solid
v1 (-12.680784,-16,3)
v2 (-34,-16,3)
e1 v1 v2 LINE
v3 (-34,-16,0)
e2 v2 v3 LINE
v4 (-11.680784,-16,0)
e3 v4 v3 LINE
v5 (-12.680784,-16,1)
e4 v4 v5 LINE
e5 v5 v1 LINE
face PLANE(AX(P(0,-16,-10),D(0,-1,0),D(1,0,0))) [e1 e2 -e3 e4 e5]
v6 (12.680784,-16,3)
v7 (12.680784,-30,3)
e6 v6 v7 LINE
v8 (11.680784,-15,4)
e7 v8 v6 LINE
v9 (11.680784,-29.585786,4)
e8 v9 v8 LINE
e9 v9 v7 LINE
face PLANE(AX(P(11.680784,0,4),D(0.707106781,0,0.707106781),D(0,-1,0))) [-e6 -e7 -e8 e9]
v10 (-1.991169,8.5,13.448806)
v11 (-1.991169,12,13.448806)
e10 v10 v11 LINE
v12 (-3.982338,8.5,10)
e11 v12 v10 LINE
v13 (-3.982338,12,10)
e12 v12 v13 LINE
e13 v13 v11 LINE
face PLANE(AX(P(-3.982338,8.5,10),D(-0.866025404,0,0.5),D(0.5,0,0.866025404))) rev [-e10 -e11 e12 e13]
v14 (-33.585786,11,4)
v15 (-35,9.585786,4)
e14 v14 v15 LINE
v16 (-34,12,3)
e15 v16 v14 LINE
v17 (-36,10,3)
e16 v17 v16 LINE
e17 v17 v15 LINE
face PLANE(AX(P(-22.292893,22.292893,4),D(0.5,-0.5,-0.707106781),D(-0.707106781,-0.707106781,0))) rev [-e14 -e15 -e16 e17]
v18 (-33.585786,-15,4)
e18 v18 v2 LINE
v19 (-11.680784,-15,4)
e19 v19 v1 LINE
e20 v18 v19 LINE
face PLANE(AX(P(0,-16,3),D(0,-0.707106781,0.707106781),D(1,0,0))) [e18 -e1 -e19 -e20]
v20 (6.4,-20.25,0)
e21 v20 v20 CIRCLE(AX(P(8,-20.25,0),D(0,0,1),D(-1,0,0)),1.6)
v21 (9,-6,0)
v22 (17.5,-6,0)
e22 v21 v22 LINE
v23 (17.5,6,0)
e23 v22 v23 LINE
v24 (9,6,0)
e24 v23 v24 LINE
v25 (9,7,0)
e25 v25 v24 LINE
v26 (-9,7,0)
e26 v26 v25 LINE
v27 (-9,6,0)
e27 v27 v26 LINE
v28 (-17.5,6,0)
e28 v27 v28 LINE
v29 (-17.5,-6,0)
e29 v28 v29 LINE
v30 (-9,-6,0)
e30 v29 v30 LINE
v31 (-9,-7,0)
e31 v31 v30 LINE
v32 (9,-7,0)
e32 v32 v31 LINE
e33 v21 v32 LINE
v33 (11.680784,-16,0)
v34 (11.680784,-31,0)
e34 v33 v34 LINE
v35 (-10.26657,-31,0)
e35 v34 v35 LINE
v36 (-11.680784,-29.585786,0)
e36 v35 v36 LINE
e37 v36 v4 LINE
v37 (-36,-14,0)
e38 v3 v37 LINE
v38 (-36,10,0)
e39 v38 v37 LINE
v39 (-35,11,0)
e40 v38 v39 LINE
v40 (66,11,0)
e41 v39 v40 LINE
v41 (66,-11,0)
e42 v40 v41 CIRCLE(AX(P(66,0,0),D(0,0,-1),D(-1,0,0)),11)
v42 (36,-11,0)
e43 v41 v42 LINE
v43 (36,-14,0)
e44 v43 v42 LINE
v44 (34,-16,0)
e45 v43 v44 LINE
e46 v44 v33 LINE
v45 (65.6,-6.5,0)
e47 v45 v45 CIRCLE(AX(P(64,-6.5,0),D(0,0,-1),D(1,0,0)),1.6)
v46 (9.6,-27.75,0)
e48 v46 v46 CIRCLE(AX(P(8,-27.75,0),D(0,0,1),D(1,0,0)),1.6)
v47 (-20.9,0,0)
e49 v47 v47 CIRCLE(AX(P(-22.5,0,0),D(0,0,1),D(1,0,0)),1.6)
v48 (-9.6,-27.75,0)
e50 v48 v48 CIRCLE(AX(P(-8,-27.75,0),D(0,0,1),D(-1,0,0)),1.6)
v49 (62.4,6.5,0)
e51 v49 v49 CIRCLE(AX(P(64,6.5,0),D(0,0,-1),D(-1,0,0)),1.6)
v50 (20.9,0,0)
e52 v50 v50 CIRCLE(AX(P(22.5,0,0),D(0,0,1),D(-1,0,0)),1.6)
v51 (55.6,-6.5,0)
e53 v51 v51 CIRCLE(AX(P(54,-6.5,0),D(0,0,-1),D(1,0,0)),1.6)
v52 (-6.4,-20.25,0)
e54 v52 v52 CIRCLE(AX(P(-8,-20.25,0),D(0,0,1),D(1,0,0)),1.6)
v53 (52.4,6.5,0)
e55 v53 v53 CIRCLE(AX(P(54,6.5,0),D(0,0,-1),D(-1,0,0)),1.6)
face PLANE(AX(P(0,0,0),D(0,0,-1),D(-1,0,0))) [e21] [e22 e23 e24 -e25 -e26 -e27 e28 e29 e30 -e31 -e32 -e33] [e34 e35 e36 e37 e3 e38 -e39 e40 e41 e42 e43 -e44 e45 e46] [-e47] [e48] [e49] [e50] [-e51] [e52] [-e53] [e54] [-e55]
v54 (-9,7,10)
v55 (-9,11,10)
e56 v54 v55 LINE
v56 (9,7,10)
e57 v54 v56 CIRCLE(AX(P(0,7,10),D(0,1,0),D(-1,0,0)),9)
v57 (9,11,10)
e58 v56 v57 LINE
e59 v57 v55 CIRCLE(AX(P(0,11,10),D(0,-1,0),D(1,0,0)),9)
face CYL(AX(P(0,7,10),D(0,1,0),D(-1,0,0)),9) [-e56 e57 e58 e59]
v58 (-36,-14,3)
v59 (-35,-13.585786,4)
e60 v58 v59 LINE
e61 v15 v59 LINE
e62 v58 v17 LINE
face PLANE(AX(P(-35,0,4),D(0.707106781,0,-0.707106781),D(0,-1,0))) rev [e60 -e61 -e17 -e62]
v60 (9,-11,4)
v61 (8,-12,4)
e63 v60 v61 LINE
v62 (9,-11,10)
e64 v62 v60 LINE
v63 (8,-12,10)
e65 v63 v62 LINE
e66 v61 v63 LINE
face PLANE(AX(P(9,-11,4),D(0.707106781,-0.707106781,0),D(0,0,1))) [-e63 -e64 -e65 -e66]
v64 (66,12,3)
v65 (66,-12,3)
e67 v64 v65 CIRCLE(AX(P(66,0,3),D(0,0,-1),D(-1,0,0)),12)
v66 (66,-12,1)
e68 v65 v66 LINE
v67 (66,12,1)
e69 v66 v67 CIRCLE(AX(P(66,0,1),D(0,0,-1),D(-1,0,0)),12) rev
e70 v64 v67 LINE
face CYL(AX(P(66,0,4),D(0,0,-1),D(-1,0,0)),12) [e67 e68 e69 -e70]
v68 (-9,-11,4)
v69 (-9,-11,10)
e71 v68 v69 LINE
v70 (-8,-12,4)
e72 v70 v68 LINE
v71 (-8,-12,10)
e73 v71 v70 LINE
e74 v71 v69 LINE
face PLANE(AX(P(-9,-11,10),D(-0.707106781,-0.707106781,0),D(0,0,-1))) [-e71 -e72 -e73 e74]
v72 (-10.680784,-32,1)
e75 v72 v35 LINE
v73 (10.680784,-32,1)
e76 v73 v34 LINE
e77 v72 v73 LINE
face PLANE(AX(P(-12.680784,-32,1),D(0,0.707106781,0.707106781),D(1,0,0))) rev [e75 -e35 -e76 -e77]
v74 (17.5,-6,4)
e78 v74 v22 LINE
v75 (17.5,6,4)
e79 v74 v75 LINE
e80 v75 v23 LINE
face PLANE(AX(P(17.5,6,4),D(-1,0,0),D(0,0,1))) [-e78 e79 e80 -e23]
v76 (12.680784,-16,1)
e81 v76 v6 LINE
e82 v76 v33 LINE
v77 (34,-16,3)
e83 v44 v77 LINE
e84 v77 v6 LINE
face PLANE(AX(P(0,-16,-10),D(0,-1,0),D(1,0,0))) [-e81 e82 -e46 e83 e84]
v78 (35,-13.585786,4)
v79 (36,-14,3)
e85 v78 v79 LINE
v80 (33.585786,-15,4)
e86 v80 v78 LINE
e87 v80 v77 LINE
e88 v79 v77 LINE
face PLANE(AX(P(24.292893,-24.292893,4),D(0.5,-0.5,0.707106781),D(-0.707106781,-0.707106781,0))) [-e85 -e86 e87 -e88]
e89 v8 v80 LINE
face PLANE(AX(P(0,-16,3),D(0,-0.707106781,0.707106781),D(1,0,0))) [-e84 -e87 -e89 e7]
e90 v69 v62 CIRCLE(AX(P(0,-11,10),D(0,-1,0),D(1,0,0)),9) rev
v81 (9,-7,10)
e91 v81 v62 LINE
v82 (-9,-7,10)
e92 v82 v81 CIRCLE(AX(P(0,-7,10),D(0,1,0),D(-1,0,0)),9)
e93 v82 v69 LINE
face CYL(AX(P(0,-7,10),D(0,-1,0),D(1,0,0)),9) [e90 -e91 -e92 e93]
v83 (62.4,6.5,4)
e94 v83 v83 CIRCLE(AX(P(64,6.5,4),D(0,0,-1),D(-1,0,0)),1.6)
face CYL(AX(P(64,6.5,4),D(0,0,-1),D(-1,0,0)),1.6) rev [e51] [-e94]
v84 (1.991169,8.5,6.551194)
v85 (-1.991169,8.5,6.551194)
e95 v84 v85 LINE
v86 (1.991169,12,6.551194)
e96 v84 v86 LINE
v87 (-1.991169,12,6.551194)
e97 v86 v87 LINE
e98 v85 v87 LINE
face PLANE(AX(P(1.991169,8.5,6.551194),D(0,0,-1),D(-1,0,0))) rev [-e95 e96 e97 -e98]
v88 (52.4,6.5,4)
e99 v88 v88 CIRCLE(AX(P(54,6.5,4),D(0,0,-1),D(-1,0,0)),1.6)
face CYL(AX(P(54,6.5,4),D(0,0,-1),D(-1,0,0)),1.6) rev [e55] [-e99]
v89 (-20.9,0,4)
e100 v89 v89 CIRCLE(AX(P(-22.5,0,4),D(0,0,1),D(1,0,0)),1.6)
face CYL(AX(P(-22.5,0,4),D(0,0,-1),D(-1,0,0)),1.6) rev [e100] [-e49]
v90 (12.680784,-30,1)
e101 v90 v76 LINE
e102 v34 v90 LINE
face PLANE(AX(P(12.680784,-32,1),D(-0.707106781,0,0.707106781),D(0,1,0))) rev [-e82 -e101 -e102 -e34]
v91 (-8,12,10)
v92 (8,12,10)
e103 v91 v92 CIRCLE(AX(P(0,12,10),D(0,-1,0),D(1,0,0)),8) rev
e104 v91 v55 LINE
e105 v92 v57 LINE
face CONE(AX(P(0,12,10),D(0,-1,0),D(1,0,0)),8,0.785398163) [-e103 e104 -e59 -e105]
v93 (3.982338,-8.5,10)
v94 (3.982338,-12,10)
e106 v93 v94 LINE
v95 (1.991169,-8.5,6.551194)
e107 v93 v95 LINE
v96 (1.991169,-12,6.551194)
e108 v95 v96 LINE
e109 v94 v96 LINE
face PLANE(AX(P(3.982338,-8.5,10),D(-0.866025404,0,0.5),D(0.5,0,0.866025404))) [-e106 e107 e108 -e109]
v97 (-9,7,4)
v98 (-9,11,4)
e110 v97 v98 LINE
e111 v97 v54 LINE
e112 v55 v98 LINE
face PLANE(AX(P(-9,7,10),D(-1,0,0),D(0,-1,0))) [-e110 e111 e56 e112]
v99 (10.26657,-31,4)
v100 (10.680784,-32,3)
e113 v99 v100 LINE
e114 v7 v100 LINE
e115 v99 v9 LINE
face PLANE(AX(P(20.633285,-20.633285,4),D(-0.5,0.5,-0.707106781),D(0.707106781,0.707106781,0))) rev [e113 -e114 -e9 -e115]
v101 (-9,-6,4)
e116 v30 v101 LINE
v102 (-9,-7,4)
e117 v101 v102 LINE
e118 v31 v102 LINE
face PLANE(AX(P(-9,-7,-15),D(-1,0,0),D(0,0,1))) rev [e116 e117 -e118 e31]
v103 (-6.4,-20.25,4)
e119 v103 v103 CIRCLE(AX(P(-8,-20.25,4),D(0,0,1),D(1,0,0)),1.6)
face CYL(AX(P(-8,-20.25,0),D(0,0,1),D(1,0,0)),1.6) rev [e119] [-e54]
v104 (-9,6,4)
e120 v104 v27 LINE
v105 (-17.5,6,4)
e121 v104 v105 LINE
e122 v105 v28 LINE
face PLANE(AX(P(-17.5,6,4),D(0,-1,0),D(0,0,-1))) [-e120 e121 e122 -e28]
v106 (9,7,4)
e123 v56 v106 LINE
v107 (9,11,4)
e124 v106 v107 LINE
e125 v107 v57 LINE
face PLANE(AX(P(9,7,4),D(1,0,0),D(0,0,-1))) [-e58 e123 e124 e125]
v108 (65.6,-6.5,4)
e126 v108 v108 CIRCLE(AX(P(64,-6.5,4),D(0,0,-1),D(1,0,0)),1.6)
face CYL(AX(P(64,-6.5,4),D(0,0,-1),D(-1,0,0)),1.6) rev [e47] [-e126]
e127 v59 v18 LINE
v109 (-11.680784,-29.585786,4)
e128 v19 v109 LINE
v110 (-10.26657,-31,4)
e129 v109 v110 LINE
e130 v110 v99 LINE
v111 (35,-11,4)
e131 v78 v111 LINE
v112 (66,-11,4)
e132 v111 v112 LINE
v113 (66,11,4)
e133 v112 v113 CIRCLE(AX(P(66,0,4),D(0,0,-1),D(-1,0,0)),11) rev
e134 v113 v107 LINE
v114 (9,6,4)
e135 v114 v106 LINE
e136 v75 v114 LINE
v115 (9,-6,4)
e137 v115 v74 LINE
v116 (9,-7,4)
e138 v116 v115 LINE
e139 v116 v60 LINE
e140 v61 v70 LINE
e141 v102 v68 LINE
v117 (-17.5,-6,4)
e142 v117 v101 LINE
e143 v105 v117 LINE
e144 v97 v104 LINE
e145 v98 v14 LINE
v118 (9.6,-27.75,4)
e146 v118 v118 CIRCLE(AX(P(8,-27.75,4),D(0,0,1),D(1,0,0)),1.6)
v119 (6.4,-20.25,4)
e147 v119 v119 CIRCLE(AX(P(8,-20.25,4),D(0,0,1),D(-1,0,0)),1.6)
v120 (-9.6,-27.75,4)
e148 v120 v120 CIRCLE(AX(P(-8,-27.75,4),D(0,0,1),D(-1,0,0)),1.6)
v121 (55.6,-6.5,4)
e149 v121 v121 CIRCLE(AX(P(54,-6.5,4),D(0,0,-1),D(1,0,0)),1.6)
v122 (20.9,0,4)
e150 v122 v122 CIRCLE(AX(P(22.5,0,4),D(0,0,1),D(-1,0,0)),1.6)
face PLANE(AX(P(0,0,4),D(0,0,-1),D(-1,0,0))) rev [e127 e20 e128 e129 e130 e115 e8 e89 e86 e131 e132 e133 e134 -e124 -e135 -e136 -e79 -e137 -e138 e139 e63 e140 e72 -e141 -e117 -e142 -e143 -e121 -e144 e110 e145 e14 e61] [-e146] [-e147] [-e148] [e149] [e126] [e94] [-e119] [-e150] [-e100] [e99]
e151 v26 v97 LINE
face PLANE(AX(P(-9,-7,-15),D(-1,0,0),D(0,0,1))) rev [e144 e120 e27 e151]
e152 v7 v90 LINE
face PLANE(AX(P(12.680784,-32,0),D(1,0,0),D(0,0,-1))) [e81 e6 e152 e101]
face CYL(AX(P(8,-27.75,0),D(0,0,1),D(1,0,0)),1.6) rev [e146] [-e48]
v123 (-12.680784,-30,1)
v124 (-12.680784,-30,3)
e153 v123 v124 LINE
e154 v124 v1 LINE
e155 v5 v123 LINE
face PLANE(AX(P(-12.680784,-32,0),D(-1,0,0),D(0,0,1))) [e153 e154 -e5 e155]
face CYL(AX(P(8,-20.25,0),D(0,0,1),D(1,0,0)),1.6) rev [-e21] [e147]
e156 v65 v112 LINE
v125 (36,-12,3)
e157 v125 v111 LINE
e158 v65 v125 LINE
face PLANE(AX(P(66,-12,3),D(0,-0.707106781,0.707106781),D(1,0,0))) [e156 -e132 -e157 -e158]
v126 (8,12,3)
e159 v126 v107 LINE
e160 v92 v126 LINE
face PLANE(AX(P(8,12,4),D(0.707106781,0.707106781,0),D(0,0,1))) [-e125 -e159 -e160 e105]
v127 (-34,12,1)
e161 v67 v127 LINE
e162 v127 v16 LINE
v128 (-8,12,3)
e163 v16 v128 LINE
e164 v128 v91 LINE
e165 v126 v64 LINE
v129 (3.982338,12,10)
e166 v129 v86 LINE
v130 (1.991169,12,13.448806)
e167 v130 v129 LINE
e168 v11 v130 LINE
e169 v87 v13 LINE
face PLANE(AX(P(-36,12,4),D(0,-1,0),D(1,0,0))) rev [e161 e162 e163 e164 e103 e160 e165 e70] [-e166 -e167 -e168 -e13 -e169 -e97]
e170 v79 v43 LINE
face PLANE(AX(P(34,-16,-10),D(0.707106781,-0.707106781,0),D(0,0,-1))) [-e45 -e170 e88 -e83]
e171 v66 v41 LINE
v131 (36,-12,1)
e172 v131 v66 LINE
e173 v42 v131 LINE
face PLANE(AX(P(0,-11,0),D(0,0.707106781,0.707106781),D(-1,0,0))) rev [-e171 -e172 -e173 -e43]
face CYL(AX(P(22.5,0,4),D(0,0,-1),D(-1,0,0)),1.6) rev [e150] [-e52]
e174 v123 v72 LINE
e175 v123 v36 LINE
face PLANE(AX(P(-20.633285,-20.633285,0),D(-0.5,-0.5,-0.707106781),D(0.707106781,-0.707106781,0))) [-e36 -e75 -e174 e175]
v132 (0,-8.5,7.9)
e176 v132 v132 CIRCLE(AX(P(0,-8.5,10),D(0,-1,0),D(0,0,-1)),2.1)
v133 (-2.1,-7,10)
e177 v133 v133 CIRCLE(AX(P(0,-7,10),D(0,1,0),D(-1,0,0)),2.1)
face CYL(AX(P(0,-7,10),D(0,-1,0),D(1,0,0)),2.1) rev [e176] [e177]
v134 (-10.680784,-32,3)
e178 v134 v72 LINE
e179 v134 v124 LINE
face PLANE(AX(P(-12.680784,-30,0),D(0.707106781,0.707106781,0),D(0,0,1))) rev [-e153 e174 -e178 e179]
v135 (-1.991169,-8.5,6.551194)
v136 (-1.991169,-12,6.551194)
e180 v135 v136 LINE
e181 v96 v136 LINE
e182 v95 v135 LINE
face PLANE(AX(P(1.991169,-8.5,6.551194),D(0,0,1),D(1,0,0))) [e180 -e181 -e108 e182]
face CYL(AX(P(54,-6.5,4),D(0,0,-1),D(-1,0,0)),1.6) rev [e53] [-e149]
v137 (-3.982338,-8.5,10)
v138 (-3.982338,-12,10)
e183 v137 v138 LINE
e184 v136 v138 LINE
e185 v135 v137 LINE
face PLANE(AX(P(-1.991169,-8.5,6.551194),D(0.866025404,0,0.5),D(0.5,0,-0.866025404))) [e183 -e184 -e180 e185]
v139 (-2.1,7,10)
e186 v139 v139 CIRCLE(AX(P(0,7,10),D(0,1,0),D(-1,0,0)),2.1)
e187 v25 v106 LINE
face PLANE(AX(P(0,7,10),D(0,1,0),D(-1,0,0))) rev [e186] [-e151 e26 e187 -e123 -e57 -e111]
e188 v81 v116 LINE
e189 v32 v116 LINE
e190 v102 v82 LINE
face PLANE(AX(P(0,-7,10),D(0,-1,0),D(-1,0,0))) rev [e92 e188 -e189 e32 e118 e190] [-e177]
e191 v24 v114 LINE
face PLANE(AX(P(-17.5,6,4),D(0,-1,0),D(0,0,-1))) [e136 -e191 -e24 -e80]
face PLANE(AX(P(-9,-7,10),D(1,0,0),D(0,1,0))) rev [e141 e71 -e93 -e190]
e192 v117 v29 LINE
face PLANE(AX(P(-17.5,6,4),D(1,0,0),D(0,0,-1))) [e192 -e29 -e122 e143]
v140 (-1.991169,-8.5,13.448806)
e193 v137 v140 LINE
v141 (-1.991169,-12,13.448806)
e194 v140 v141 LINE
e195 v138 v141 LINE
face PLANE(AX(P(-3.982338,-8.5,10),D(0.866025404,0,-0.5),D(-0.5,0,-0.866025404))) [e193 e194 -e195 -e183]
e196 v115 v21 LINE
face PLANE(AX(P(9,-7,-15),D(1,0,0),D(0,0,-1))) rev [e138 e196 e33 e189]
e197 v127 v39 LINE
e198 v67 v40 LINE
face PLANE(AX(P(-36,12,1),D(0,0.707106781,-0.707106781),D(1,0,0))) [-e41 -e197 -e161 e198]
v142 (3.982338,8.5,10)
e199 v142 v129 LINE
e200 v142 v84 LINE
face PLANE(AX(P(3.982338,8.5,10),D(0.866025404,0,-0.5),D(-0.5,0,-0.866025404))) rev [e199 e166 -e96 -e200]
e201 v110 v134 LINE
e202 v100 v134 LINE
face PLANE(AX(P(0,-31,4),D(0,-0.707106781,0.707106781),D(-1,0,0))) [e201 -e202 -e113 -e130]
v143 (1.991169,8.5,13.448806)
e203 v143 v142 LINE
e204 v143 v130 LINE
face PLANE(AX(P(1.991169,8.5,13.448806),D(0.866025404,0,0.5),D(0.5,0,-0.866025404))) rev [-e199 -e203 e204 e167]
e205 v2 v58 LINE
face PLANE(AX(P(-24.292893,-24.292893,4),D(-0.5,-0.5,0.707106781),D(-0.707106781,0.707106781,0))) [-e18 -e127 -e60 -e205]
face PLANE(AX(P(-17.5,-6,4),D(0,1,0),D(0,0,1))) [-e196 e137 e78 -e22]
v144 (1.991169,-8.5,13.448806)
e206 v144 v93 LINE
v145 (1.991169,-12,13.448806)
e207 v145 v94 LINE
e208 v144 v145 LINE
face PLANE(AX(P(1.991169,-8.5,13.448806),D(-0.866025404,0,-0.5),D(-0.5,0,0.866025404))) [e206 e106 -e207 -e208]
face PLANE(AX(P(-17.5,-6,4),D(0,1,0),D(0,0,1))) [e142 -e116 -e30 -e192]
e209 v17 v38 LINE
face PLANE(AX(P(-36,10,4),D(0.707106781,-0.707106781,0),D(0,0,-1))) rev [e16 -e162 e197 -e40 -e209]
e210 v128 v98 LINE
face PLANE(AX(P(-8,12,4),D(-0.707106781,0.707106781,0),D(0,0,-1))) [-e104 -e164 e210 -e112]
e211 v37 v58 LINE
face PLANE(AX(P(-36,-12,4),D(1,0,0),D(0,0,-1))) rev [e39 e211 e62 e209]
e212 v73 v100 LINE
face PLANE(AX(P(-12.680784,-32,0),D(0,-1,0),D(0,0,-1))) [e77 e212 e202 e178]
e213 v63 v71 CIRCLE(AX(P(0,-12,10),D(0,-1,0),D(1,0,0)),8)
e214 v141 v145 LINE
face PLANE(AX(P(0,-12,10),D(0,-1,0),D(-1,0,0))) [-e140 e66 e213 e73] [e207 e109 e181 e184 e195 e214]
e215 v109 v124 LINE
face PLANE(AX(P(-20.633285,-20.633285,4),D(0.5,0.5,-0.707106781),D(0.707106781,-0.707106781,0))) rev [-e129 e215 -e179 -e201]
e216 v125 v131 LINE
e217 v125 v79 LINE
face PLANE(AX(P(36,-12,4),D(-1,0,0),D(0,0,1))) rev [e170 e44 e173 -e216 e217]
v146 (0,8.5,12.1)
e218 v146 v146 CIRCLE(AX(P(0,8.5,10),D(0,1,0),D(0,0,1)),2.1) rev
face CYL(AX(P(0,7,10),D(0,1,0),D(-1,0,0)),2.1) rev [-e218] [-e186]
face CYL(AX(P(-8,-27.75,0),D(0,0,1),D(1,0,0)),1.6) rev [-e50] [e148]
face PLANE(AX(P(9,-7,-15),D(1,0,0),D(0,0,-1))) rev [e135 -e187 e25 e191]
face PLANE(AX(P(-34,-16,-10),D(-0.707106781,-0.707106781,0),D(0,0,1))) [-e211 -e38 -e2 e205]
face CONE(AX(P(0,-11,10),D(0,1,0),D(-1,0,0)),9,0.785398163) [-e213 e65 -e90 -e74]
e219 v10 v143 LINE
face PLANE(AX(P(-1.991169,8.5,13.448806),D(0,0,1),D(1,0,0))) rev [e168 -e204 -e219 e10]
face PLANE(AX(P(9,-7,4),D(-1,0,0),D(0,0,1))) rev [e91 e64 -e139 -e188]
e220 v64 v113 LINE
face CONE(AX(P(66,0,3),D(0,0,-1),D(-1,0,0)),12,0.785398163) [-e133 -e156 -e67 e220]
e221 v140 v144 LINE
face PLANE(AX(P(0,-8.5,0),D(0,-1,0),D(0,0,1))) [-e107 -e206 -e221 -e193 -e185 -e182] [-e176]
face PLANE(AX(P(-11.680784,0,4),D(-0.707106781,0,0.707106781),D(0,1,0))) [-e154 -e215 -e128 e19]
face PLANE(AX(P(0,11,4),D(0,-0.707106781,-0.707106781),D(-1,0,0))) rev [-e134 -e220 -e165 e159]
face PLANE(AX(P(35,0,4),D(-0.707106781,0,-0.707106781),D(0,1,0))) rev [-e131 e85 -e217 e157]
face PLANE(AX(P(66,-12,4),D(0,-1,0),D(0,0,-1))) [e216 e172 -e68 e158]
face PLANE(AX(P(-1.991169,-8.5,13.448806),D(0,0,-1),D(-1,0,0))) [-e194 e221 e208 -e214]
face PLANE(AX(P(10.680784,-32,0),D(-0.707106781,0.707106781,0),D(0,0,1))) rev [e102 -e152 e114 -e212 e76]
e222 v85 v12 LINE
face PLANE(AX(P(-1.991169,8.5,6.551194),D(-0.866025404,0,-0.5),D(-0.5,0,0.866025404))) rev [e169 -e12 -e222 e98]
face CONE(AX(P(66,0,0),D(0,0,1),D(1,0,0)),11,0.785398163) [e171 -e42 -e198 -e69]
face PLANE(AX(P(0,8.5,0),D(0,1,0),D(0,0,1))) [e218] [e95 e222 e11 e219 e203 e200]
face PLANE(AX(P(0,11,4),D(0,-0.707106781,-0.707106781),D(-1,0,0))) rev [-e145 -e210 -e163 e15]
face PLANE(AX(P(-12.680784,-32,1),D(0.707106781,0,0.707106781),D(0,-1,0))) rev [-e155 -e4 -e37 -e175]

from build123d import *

# Parameters (mm, degrees)
CROQUIS1_W              = 72
CROQUIS1_H              = 24
CROQUIS1_R              = 1.6
CROQUIS1_W_2            = 35
CROQUIS1_H_2            = 12
SALIENTE_EXTRUIR1_DEPTH = 4
CROQUIS2_R              = 3.125
SALIENTE_EXTRUIR2_DEPTH = 4
CROQUIS3_R              = 1.6
SALIENTE_EXTRUIR3_DEPTH = 4
CROQUIS5_R              = 2.1
SALIENTE_EXTRUIR4_DEPTH = 5
CORTAR_EXTRUIR1_DEPTH   = 3.5
REDONDEO1_R             = 3
CROQUIS7_W              = 25.361567636
CROQUIS7_H              = 16
CROQUIS7_R              = 1.6
SALIENTE_EXTRUIR5_DEPTH = 4
CHAFL_N1_SIZE           = 2
CHAFL_N2_SIZE           = 1
CROQUIS8_W              = 18
CROQUIS8_H              = 14
CORTAR_EXTRUIR2_DEPTH   = 87.423376467
CROQUIS9_W              = 19.069204895
CROQUIS9_H              = 8.04839492
CORTAR_EXTRUIR3_DEPTH   = 120.920807202


with BuildPart() as part:
    # Croquis1 → Saliente-Extruir1 (new body)
    with BuildSketch(Plane.XY):
        Rectangle(CROQUIS1_W, CROQUIS1_H)
        with Locations((-22.5, 0)):
            Circle(CROQUIS1_R, mode=Mode.SUBTRACT)
        with Locations(Location((22.5, 0, 0), (0, 0, 180))):
            Circle(CROQUIS1_R, mode=Mode.SUBTRACT)
        Rectangle(CROQUIS1_W_2, CROQUIS1_H_2, mode=Mode.SUBTRACT)
    extrude(amount=SALIENTE_EXTRUIR1_DEPTH)

    # Croquis2 → Saliente-Extruir2 (add)
    with BuildSketch(Plane.XZ.offset(12)):
        with BuildLine():
            Line((-5, -10), (-5, -4))
            Line((-5, -4), (-36, -4))
            Line((-36, -4), (-36, 4))
            Line((-36, 4), (36, 4))
            Line((36, 4), (36, -4))
            Line((36, -4), (5, -4))
            Line((5, -4), (5, -10))
            ThreePointArc((5, -10), (0, -15), (-5, -10))
        make_face()
        with Locations((0, -10)):
            Circle(CROQUIS2_R, mode=Mode.SUBTRACT)
    extrude(amount=SALIENTE_EXTRUIR2_DEPTH)

    # Croquis3 → Saliente-Extruir3 (add)
    with BuildSketch(Plane(origin=(0, 0, 0), x_dir=(-1, 0, 0), z_dir=(0, 0, -1))):
        with BuildLine():
            Line((-66, 12), (-36, 12))
            Line((-36, 12), (-36, -12))
            Line((-36, -12), (-66, -12))
            ThreePointArc((-66, -12), (-78, 0), (-66, 12))
        make_face()
        with Locations((-54, 6.5)):
            Circle(CROQUIS3_R, mode=Mode.SUBTRACT)
        with Locations((-64, 6.5)):
            Circle(CROQUIS3_R, mode=Mode.SUBTRACT)
        with Locations(Location((-54, -6.5, 0), (0, 0, 180))):
            Circle(CROQUIS3_R, mode=Mode.SUBTRACT)
        with Locations(Location((-64, -6.5, 0), (0, 0, 180))):
            Circle(CROQUIS3_R, mode=Mode.SUBTRACT)
    extrude(amount=-SALIENTE_EXTRUIR3_DEPTH)

    # Croquis5 → Saliente-Extruir4 (add)
    with BuildSketch(Plane(origin=(0, 12, 0), x_dir=(1, 0, 0), z_dir=(0, 1, 0))):
        with BuildLine():
            Line((-9, -10), (-9, -4))
            Line((-9, -4), (9, -4))
            Line((9, -4), (9, -10))
            ThreePointArc((9, -10), (0, -19), (-9, -10))
        make_face()
        with Locations(Location((0, -10, 0), (0, 0, 180))):
            Circle(CROQUIS5_R, mode=Mode.SUBTRACT)
    saliente_extruir4 = extrude(amount=-SALIENTE_EXTRUIR4_DEPTH)

    # Croquis6 → Cortar-Extruir1 (cut)
    with BuildSketch(Plane(origin=(0, 12, 0), x_dir=(1, 0, 0), z_dir=(0, 1, 0))):
        Polygon((3.982338332, -10), (1.991169166, -6.551193838), (-1.991169166, -6.551193838), (-3.982338332, -10), (-1.991169166, -13.448806162), (1.991169166, -13.448806162), align=None)
    cortar_extruir1 = extrude(amount=-CORTAR_EXTRUIR1_DEPTH, mode=Mode.SUBTRACT)

    # Simetría1: Saliente-Extruir4, Cortar-Extruir1 across plane
    add(saliente_extruir4.mirror(Plane.ZX))
    add(cortar_extruir1.mirror(Plane.ZX), mode=Mode.SUBTRACT)

    # Redondeo1
    redondeo1_edges = [part.edges().sort_by_distance(p)[0] for p in [
        (0, -12, 0),
    ]]
    fillet(redondeo1_edges, radius=REDONDEO1_R)

    # Croquis7 → Saliente-Extruir5 (add)
    with BuildSketch(Plane.XY.offset(4)):
        with Locations((0, -24)):
            Rectangle(CROQUIS7_W, CROQUIS7_H)
        with Locations((-8, -20.25)):
            Circle(CROQUIS7_R, mode=Mode.SUBTRACT)
        with Locations(Location((8, -20.25, 0), (0, 0, 180))):
            Circle(CROQUIS7_R, mode=Mode.SUBTRACT)
        with Locations((8, -27.75)):
            Circle(CROQUIS7_R, mode=Mode.SUBTRACT)
        with Locations(Location((-8, -27.75, 0), (0, 0, 180))):
            Circle(CROQUIS7_R, mode=Mode.SUBTRACT)
    extrude(amount=-SALIENTE_EXTRUIR5_DEPTH)

    # Chaflán1
    chafl_n1_edges = [part.edges().sort_by_distance(p)[0] for p in [
        (12.680783818, -32, 2),
        (-12.680783818, -32, 2),
        (36, -16, 0),
        (-36, -16, 0),
        (-36, 12, 2),
    ]]
    chamfer(chafl_n1_edges, length=CHAFL_N1_SIZE)

    # Chaflán2
    # the kernel refuses this chamfer: 1 mm, written as the material it takes off along each edge
    with BuildSketch(Plane(origin=(0, -12, 10), x_dir=(1, 0, 0), z_dir=(0, 0, -1))) as chafl_n2_piece_1:
        Polygon((9 - CHAFL_N2_SIZE, 0), (9, -CHAFL_N2_SIZE), (9, 0), align=None)
    revolve(axis=Axis((0, -12, 10), (0, -1, 0)), revolution_arc=180, mode=Mode.SUBTRACT)
    with BuildSketch(Plane(origin=(9, -12, 4), x_dir=(-0.9996219169112968, -0.027495876610585623, 0), z_dir=(0, 0, 1)), Plane(origin=(-9, -12, 10), x_dir=(0.9996219169112968, -0.0274958766105856, 0), z_dir=(0, 0, -1))) as chafl_n2_piece_2:
        Polygon((CHAFL_N2_SIZE * 0.999621916911, -CHAFL_N2_SIZE * 0.0274958766106), (-CHAFL_N2_SIZE * 0.0274958766106, -CHAFL_N2_SIZE * 0.999621916911), (0, 0), align=None)
    extrude(amount=6, mode=Mode.SUBTRACT)
    with BuildSketch(Plane(origin=(-36.571682988, -16, 4), x_dir=(0, 0.9996219169112968, 0.02749587661058651), z_dir=(1, 0, 0)), Plane(origin=(12.680783818, -16, 4), x_dir=(0, 0.9996219169112968, 0.02749587661058651), z_dir=(1, 0, 0))) as chafl_n2_piece_3:
        Polygon((CHAFL_N2_SIZE * 0.999621916911, -CHAFL_N2_SIZE * 0.0274958766106), (-CHAFL_N2_SIZE * 0.0274958766106, -CHAFL_N2_SIZE * 0.999621916911), (0, 0), align=None)
    extrude(amount=23.89089917, mode=Mode.SUBTRACT)
    with BuildSketch(Plane(origin=(-12.680783818, -16, 0), x_dir=(-0.02749587661058563, 0, 0.9996219169112968), z_dir=(0, -1, 0)), Plane(origin=(-12.680783818, -16, 4), x_dir=(0.9996219169112968, 0, 0.02749587661058651), z_dir=(0, -1, 0)), Plane(origin=(12.680783818, -32.571682988, 4), x_dir=(-0.9996219169112968, 0, 0.02749587661058651), z_dir=(0, 1, 0)), Plane(origin=(12.680783818, -32.571682988, 0), x_dir=(0.02749587661058563, 0, 0.9996219169112968), z_dir=(0, 1, 0))) as chafl_n2_piece_4:
        Polygon((CHAFL_N2_SIZE * 0.999621916911, -CHAFL_N2_SIZE * 0.0274958766106), (-CHAFL_N2_SIZE * 0.0274958766106, -CHAFL_N2_SIZE * 0.999621916911), (0, 0), align=None)
    extrude(amount=16.571682988, mode=Mode.SUBTRACT)
    with BuildSketch(Plane(origin=(-36, 12.571682988, 4), x_dir=(0.9996219169112968, 0, 0.027495876610586414), z_dir=(0, -1, 0))) as chafl_n2_piece_5:
        Polygon((CHAFL_N2_SIZE * 0.999621916911, -CHAFL_N2_SIZE * 0.0274958766106), (-CHAFL_N2_SIZE * 0.0274958766106, -CHAFL_N2_SIZE * 0.999621916911), (0, 0), align=None)
    extrude(amount=29.143365976, mode=Mode.SUBTRACT)
    with BuildSketch(Plane(origin=(-13.252466806, -32, 4), x_dir=(0, 0.9996219169112968, 0.02749587661058651), z_dir=(1, 0, 0)), Plane(origin=(-13.252466806, -32, 0), x_dir=(0, -0.02749587661058908, 0.9996219169112968), z_dir=(1, 0, 0))) as chafl_n2_piece_6:
        Polygon((CHAFL_N2_SIZE * 0.999621916911, -CHAFL_N2_SIZE * 0.0274958766106), (-CHAFL_N2_SIZE * 0.0274958766106, -CHAFL_N2_SIZE * 0.999621916911), (0, 0), align=None)
    extrude(amount=26.504933612, mode=Mode.SUBTRACT)
    with BuildSketch(Plane(origin=(36, -12, 4), x_dir=(0.02749587661058907, 0, -0.9996219169112965), z_dir=(0, -1, 0))) as chafl_n2_piece_7:
        Polygon((CHAFL_N2_SIZE * 0.999621916911, -CHAFL_N2_SIZE * 0.0274958766106), (-CHAFL_N2_SIZE * 0.0274958766106, -CHAFL_N2_SIZE * 0.999621916911), (0, 0), align=None)
    extrude(amount=4.571682988, mode=Mode.SUBTRACT)
    with BuildSketch(Plane(origin=(14.499238298, -28.18154552, 4), x_dir=(-0.7068394360706736, 0.7068394360706736, 0.027495876610586528), z_dir=(-0.7071067811865476, -0.7071067811865476, 0)), Plane(origin=(-32.18154552, -17.81845448, 4), x_dir=(0.7068394360706736, 0.7068394360706736, 0.027495876610586563), z_dir=(-0.7071067811865476, 0.7071067811865476, 0)), Plane(origin=(-37.81845448, 8.18154552, 4), x_dir=(0.7068394360706736, -0.7068394360706736, 0.027495876610586462), z_dir=(0.7071067811865476, 0.7071067811865476, 0))) as chafl_n2_piece_8:
        Polygon((CHAFL_N2_SIZE * 0.999621916911, CHAFL_N2_SIZE * 0.0274958766106), (-CHAFL_N2_SIZE * 0.0274958766106, CHAFL_N2_SIZE * 0.999621916911), (0, 0), align=None)
    extrude(amount=7.971793101, mode=Mode.SUBTRACT)
    with BuildSketch(Plane(origin=(-14.499238298, -28.18154552, 4), x_dir=(0.7068394360706736, 0.7068394360706736, 0.027495876610586528), z_dir=(0.7071067811865476, -0.7071067811865476, 0)), Plane(origin=(37.81845448, -12.18154552, 4), x_dir=(0.019442520806013792, -0.019442520806013792, -0.9996219169112968), z_dir=(-0.7071067811865476, -0.7071067811865476, 0)), Plane(origin=(-14.499238298, -28.18154552, 0), x_dir=(-0.019442520806013792, -0.019442520806013792, 0.9996219169112968), z_dir=(0.7071067811865476, -0.7071067811865476, 0))) as chafl_n2_piece_9:
        Polygon((CHAFL_N2_SIZE * 0.999621916911, -CHAFL_N2_SIZE * 0.0274958766106), (-CHAFL_N2_SIZE * 0.0274958766106, -CHAFL_N2_SIZE * 0.999621916911), (0, 0), align=None)
    extrude(amount=7.971793101, mode=Mode.SUBTRACT)
    with BuildSketch(Plane(origin=(-36.571682988, 12, 0), x_dir=(0, -0.9996219169112968, -0.02749587661058639), z_dir=(1, 0, 0))) as chafl_n2_piece_10:
        Polygon((CHAFL_N2_SIZE * 0.999621916911, -CHAFL_N2_SIZE * 0.0274958766106), (-CHAFL_N2_SIZE * 0.0274958766106, -CHAFL_N2_SIZE * 0.999621916911), (0, 0), align=None)
    extrude(amount=102.571682988, mode=Mode.SUBTRACT)
    with BuildSketch(Plane(origin=(66, 0, 4), x_dir=(0, -1, 0), z_dir=(-1, 0, 0))) as chafl_n2_piece_11:
        Polygon((12 - CHAFL_N2_SIZE, 0), (12, -CHAFL_N2_SIZE), (12, 0), align=None)
    revolve(axis=Axis((66, 0, 4), (0, 0, 1)), revolution_arc=180, mode=Mode.SUBTRACT)
    with BuildSketch(Plane(origin=(66, 0, 0), x_dir=(0, -1, 0), z_dir=(-1, 0, 0))) as chafl_n2_piece_12:
        Polygon((12 - CHAFL_N2_SIZE, 0), (12, CHAFL_N2_SIZE), (12, 0), align=None)
    revolve(axis=Axis((66, 0, 0), (0, 0, 1)), revolution_arc=180, mode=Mode.SUBTRACT)
    with BuildSketch(Plane(origin=(36, -12, 0), x_dir=(0, -0.02749587661058563, 0.9996219169112968), z_dir=(1, 0, 0)), Plane(origin=(36, -12, 4), x_dir=(0, 0.9996219169112968, 0.02749587661058651), z_dir=(1, 0, 0))) as chafl_n2_piece_13:
        Polygon((CHAFL_N2_SIZE * 0.999621916911, -CHAFL_N2_SIZE * 0.0274958766106), (-CHAFL_N2_SIZE * 0.0274958766106, -CHAFL_N2_SIZE * 0.999621916911), (0, 0), align=None)
    extrude(amount=30, mode=Mode.SUBTRACT)
    with BuildSketch(Plane(origin=(-9, 12, 4), x_dir=(0, -0.9996219169112968, 0.02749587661058651), z_dir=(-1, 0, 0))) as chafl_n2_piece_14:
        Polygon((CHAFL_N2_SIZE * 0.999621916911, -CHAFL_N2_SIZE * 0.0274958766106), (-CHAFL_N2_SIZE * 0.0274958766106, -CHAFL_N2_SIZE * 0.999621916911), (0, 0), align=None)
    extrude(amount=27.571682988, mode=Mode.SUBTRACT)
    with BuildSketch(Plane(origin=(66, 12, 4), x_dir=(0, -0.9996219169112968, 0.02749587661058651), z_dir=(-1, 0, 0))) as chafl_n2_piece_15:
        Polygon((CHAFL_N2_SIZE * 0.999621916911, -CHAFL_N2_SIZE * 0.0274958766106), (-CHAFL_N2_SIZE * 0.0274958766106, -CHAFL_N2_SIZE * 0.999621916911), (0, 0), align=None)
    extrude(amount=57, mode=Mode.SUBTRACT)
    with BuildSketch(Plane(origin=(0, 12, 10), x_dir=(1, 0, 0), z_dir=(0, 0, -1))) as chafl_n2_piece_16:
        Polygon((9 - CHAFL_N2_SIZE, 0), (9, CHAFL_N2_SIZE), (9, 0), align=None)
    revolve(axis=Axis((0, 12, 10), (0, -1, 0)), revolution_arc=180, mode=Mode.SUBTRACT)
    with BuildSketch(Plane(origin=(9, 12, 4), x_dir=(-0.9996219169112968, 0.027495876610587396, 0), z_dir=(0, 0, 1)), Plane(origin=(-9, 12, 10), x_dir=(0.9996219169112968, 0.027495876610585623, 0), z_dir=(0, 0, -1))) as chafl_n2_piece_17:
        Polygon((CHAFL_N2_SIZE * 0.999621916911, CHAFL_N2_SIZE * 0.0274958766106), (-CHAFL_N2_SIZE * 0.0274958766106, CHAFL_N2_SIZE * 0.999621916911), (0, 0), align=None)
    extrude(amount=6, mode=Mode.SUBTRACT)
    with BuildSketch(Plane(origin=(-12.680783818, -13.428317012, 4), x_dir=(0.9996219169112968, 0, 0.02749587661058651), z_dir=(0, -1, 0))) as chafl_n2_piece_18a_section:
        Polygon((CHAFL_N2_SIZE * 0.999621916911, -CHAFL_N2_SIZE * 0.0274958766106), (-CHAFL_N2_SIZE * 0.0274958766106, -CHAFL_N2_SIZE * 0.999621916911), (0, 0), align=None)
    chafl_n2_piece_18a = extrude(amount=19.143365976, mode=Mode.PRIVATE)
    chafl_n2_piece_18a = split(chafl_n2_piece_18a, bisect_by=Plane(origin=(-12.350990191, -16, 3.670206373), z_dir=(0, 1, 0)), keep=Keep.TOP, mode=Mode.PRIVATE)
    with BuildSketch(Plane(origin=(-36.571682988, -16, 4), x_dir=(0, 0.9996219169112968, 0.02749587661058651), z_dir=(1, 0, 0))) as chafl_n2_piece_18b_section:
        Polygon((CHAFL_N2_SIZE * 0.999621916911, -CHAFL_N2_SIZE * 0.0274958766106), (-CHAFL_N2_SIZE * 0.0274958766106, -CHAFL_N2_SIZE * 0.999621916911), (0, 0), align=None)
    chafl_n2_piece_18b = extrude(amount=26.462582158, mode=Mode.PRIVATE)
    chafl_n2_piece_18b = split(chafl_n2_piece_18b, bisect_by=Plane(origin=(-12.680783818, -15.670206373, 3.670206373), z_dir=(1, 0, 0)), keep=Keep.TOP, mode=Mode.PRIVATE)
    chafl_n2_piece_18 = chafl_n2_piece_18a & chafl_n2_piece_18b
    add(chafl_n2_piece_18, mode=Mode.SUBTRACT)
    with BuildSketch(Plane(origin=(10.10910083, -16, 4), x_dir=(0, 0.9996219169112968, 0.02749587661058651), z_dir=(1, 0, 0))) as chafl_n2_piece_19a_section:
        Polygon((CHAFL_N2_SIZE * 0.999621916911, -CHAFL_N2_SIZE * 0.0274958766106), (-CHAFL_N2_SIZE * 0.0274958766106, -CHAFL_N2_SIZE * 0.999621916911), (0, 0), align=None)
    chafl_n2_piece_19a = extrude(amount=26.462582158, mode=Mode.PRIVATE)
    chafl_n2_piece_19a = split(chafl_n2_piece_19a, bisect_by=Plane(origin=(12.680783818, -15.670206373, 3.670206373), z_dir=(-1, 0, 0)), keep=Keep.TOP, mode=Mode.PRIVATE)
    with BuildSketch(Plane(origin=(12.680783818, -32.571682988, 4), x_dir=(-0.9996219169112968, 0, 0.02749587661058651), z_dir=(0, 1, 0))) as chafl_n2_piece_19b_section:
        Polygon((CHAFL_N2_SIZE * 0.999621916911, -CHAFL_N2_SIZE * 0.0274958766106), (-CHAFL_N2_SIZE * 0.0274958766106, -CHAFL_N2_SIZE * 0.999621916911), (0, 0), align=None)
    chafl_n2_piece_19b = extrude(amount=19.143365976, mode=Mode.PRIVATE)
    chafl_n2_piece_19b = split(chafl_n2_piece_19b, bisect_by=Plane(origin=(12.350990191, -16, 3.670206373), z_dir=(0, 1, 0)), keep=Keep.TOP, mode=Mode.PRIVATE)
    chafl_n2_piece_19 = chafl_n2_piece_19a & chafl_n2_piece_19b
    add(chafl_n2_piece_19, mode=Mode.SUBTRACT)
    with BuildSketch(Plane(origin=(36, -9.428317012, 4), x_dir=(0.02749587661058907, 0, -0.9996219169112965), z_dir=(0, -1, 0))) as chafl_n2_piece_20a_section:
        Polygon((CHAFL_N2_SIZE * 0.999621916911, -CHAFL_N2_SIZE * 0.0274958766106), (-CHAFL_N2_SIZE * 0.0274958766106, -CHAFL_N2_SIZE * 0.999621916911), (0, 0), align=None)
    chafl_n2_piece_20a = extrude(amount=7.143365976, mode=Mode.PRIVATE)
    chafl_n2_piece_20a = split(chafl_n2_piece_20a, bisect_by=Plane(origin=(35.670206373, -12, 3.670206373), z_dir=(0, 1, 0)), keep=Keep.TOP, mode=Mode.PRIVATE)
    with BuildSketch(Plane(origin=(33.428317012, -12, 4), x_dir=(0, 0.9996219169112968, 0.02749587661058651), z_dir=(1, 0, 0))) as chafl_n2_piece_20b_section:
        Polygon((CHAFL_N2_SIZE * 0.999621916911, -CHAFL_N2_SIZE * 0.0274958766106), (-CHAFL_N2_SIZE * 0.0274958766106, -CHAFL_N2_SIZE * 0.999621916911), (0, 0), align=None)
    chafl_n2_piece_20b = extrude(amount=32.571682988, mode=Mode.PRIVATE)
    chafl_n2_piece_20b = split(chafl_n2_piece_20b, bisect_by=Plane(origin=(36, -11.670206373, 3.670206373), z_dir=(-1, 0, 0)), keep=Keep.TOP, mode=Mode.PRIVATE)
    chafl_n2_piece_20 = chafl_n2_piece_20a & chafl_n2_piece_20b
    add(chafl_n2_piece_20, mode=Mode.SUBTRACT)
    with BuildSketch(Plane(origin=(-6.428317012, 12, 4), x_dir=(0, -0.9996219169112968, 0.02749587661058651), z_dir=(-1, 0, 0))) as chafl_n2_piece_21a_section:
        Polygon((CHAFL_N2_SIZE * 0.999621916911, -CHAFL_N2_SIZE * 0.0274958766106), (-CHAFL_N2_SIZE * 0.0274958766106, -CHAFL_N2_SIZE * 0.999621916911), (0, 0), align=None)
    chafl_n2_piece_21a = extrude(amount=30.143365976, mode=Mode.PRIVATE)
    chafl_n2_piece_21a = split(chafl_n2_piece_21a, bisect_by=Plane(origin=(-9, 11.670206373, 3.670206373), z_dir=(1, 0, 0)), keep=Keep.TOP, mode=Mode.PRIVATE)
    with BuildSketch(Plane(origin=(-9, 12, 10), x_dir=(0.9996219169112968, 0.027495876610585623, 0), z_dir=(0, 0, -1))) as chafl_n2_piece_21b_section:
        Polygon((CHAFL_N2_SIZE * 0.999621916911, CHAFL_N2_SIZE * 0.0274958766106), (-CHAFL_N2_SIZE * 0.0274958766106, CHAFL_N2_SIZE * 0.999621916911), (0, 0), align=None)
    chafl_n2_piece_21b = extrude(amount=8.571682988, mode=Mode.PRIVATE)
    chafl_n2_piece_21b = split(chafl_n2_piece_21b, bisect_by=Plane(origin=(-8.670206373, 11.670206373, 4), z_dir=(0, 0, -1)), keep=Keep.TOP, mode=Mode.PRIVATE)
    chafl_n2_piece_21 = chafl_n2_piece_21a & chafl_n2_piece_21b
    add(chafl_n2_piece_21, mode=Mode.SUBTRACT)
    with BuildSketch(Plane(origin=(66, 12, 4), x_dir=(0, -0.9996219169112968, 0.02749587661058651), z_dir=(-1, 0, 0))) as chafl_n2_piece_22a_section:
        Polygon((CHAFL_N2_SIZE * 0.999621916911, -CHAFL_N2_SIZE * 0.0274958766106), (-CHAFL_N2_SIZE * 0.0274958766106, -CHAFL_N2_SIZE * 0.999621916911), (0, 0), align=None)
    chafl_n2_piece_22a = extrude(amount=59.571682988, mode=Mode.PRIVATE)
    chafl_n2_piece_22a = split(chafl_n2_piece_22a, bisect_by=Plane(origin=(9, 11.670206373, 3.670206373), z_dir=(-1, 0, 0)), keep=Keep.TOP, mode=Mode.PRIVATE)
    with BuildSketch(Plane(origin=(9, 12, 1.428317012), x_dir=(-0.9996219169112968, 0.027495876610585623, 0), z_dir=(0, 0, 1))) as chafl_n2_piece_22b_section:
        Polygon((CHAFL_N2_SIZE * 0.999621916911, CHAFL_N2_SIZE * 0.0274958766106), (-CHAFL_N2_SIZE * 0.0274958766106, CHAFL_N2_SIZE * 0.999621916911), (0, 0), align=None)
    chafl_n2_piece_22b = extrude(amount=8.571682988, mode=Mode.PRIVATE)
    chafl_n2_piece_22b = split(chafl_n2_piece_22b, bisect_by=Plane(origin=(8.670206373, 11.670206373, 4), z_dir=(0, 0, -1)), keep=Keep.TOP, mode=Mode.PRIVATE)
    chafl_n2_piece_22 = chafl_n2_piece_22a & chafl_n2_piece_22b
    add(chafl_n2_piece_22, mode=Mode.SUBTRACT)

    # Croquis8 → Cortar-Extruir2 (cut, through all)
    with BuildSketch(Plane.XY.offset(4)):
        Rectangle(CROQUIS8_W, CROQUIS8_H)
    extrude(amount=-CORTAR_EXTRUIR2_DEPTH, mode=Mode.SUBTRACT)

    # Croquis9 → Cortar-Extruir3 (cut, through all)
    with BuildSketch(Plane.ZY.offset(36)):
        with Locations((-9.534602448, -11.97580254)):
            Rectangle(CROQUIS9_W, CROQUIS9_H)
    extrude(amount=-CORTAR_EXTRUIR3_DEPTH, mode=Mode.SUBTRACT)


solid = part.part
